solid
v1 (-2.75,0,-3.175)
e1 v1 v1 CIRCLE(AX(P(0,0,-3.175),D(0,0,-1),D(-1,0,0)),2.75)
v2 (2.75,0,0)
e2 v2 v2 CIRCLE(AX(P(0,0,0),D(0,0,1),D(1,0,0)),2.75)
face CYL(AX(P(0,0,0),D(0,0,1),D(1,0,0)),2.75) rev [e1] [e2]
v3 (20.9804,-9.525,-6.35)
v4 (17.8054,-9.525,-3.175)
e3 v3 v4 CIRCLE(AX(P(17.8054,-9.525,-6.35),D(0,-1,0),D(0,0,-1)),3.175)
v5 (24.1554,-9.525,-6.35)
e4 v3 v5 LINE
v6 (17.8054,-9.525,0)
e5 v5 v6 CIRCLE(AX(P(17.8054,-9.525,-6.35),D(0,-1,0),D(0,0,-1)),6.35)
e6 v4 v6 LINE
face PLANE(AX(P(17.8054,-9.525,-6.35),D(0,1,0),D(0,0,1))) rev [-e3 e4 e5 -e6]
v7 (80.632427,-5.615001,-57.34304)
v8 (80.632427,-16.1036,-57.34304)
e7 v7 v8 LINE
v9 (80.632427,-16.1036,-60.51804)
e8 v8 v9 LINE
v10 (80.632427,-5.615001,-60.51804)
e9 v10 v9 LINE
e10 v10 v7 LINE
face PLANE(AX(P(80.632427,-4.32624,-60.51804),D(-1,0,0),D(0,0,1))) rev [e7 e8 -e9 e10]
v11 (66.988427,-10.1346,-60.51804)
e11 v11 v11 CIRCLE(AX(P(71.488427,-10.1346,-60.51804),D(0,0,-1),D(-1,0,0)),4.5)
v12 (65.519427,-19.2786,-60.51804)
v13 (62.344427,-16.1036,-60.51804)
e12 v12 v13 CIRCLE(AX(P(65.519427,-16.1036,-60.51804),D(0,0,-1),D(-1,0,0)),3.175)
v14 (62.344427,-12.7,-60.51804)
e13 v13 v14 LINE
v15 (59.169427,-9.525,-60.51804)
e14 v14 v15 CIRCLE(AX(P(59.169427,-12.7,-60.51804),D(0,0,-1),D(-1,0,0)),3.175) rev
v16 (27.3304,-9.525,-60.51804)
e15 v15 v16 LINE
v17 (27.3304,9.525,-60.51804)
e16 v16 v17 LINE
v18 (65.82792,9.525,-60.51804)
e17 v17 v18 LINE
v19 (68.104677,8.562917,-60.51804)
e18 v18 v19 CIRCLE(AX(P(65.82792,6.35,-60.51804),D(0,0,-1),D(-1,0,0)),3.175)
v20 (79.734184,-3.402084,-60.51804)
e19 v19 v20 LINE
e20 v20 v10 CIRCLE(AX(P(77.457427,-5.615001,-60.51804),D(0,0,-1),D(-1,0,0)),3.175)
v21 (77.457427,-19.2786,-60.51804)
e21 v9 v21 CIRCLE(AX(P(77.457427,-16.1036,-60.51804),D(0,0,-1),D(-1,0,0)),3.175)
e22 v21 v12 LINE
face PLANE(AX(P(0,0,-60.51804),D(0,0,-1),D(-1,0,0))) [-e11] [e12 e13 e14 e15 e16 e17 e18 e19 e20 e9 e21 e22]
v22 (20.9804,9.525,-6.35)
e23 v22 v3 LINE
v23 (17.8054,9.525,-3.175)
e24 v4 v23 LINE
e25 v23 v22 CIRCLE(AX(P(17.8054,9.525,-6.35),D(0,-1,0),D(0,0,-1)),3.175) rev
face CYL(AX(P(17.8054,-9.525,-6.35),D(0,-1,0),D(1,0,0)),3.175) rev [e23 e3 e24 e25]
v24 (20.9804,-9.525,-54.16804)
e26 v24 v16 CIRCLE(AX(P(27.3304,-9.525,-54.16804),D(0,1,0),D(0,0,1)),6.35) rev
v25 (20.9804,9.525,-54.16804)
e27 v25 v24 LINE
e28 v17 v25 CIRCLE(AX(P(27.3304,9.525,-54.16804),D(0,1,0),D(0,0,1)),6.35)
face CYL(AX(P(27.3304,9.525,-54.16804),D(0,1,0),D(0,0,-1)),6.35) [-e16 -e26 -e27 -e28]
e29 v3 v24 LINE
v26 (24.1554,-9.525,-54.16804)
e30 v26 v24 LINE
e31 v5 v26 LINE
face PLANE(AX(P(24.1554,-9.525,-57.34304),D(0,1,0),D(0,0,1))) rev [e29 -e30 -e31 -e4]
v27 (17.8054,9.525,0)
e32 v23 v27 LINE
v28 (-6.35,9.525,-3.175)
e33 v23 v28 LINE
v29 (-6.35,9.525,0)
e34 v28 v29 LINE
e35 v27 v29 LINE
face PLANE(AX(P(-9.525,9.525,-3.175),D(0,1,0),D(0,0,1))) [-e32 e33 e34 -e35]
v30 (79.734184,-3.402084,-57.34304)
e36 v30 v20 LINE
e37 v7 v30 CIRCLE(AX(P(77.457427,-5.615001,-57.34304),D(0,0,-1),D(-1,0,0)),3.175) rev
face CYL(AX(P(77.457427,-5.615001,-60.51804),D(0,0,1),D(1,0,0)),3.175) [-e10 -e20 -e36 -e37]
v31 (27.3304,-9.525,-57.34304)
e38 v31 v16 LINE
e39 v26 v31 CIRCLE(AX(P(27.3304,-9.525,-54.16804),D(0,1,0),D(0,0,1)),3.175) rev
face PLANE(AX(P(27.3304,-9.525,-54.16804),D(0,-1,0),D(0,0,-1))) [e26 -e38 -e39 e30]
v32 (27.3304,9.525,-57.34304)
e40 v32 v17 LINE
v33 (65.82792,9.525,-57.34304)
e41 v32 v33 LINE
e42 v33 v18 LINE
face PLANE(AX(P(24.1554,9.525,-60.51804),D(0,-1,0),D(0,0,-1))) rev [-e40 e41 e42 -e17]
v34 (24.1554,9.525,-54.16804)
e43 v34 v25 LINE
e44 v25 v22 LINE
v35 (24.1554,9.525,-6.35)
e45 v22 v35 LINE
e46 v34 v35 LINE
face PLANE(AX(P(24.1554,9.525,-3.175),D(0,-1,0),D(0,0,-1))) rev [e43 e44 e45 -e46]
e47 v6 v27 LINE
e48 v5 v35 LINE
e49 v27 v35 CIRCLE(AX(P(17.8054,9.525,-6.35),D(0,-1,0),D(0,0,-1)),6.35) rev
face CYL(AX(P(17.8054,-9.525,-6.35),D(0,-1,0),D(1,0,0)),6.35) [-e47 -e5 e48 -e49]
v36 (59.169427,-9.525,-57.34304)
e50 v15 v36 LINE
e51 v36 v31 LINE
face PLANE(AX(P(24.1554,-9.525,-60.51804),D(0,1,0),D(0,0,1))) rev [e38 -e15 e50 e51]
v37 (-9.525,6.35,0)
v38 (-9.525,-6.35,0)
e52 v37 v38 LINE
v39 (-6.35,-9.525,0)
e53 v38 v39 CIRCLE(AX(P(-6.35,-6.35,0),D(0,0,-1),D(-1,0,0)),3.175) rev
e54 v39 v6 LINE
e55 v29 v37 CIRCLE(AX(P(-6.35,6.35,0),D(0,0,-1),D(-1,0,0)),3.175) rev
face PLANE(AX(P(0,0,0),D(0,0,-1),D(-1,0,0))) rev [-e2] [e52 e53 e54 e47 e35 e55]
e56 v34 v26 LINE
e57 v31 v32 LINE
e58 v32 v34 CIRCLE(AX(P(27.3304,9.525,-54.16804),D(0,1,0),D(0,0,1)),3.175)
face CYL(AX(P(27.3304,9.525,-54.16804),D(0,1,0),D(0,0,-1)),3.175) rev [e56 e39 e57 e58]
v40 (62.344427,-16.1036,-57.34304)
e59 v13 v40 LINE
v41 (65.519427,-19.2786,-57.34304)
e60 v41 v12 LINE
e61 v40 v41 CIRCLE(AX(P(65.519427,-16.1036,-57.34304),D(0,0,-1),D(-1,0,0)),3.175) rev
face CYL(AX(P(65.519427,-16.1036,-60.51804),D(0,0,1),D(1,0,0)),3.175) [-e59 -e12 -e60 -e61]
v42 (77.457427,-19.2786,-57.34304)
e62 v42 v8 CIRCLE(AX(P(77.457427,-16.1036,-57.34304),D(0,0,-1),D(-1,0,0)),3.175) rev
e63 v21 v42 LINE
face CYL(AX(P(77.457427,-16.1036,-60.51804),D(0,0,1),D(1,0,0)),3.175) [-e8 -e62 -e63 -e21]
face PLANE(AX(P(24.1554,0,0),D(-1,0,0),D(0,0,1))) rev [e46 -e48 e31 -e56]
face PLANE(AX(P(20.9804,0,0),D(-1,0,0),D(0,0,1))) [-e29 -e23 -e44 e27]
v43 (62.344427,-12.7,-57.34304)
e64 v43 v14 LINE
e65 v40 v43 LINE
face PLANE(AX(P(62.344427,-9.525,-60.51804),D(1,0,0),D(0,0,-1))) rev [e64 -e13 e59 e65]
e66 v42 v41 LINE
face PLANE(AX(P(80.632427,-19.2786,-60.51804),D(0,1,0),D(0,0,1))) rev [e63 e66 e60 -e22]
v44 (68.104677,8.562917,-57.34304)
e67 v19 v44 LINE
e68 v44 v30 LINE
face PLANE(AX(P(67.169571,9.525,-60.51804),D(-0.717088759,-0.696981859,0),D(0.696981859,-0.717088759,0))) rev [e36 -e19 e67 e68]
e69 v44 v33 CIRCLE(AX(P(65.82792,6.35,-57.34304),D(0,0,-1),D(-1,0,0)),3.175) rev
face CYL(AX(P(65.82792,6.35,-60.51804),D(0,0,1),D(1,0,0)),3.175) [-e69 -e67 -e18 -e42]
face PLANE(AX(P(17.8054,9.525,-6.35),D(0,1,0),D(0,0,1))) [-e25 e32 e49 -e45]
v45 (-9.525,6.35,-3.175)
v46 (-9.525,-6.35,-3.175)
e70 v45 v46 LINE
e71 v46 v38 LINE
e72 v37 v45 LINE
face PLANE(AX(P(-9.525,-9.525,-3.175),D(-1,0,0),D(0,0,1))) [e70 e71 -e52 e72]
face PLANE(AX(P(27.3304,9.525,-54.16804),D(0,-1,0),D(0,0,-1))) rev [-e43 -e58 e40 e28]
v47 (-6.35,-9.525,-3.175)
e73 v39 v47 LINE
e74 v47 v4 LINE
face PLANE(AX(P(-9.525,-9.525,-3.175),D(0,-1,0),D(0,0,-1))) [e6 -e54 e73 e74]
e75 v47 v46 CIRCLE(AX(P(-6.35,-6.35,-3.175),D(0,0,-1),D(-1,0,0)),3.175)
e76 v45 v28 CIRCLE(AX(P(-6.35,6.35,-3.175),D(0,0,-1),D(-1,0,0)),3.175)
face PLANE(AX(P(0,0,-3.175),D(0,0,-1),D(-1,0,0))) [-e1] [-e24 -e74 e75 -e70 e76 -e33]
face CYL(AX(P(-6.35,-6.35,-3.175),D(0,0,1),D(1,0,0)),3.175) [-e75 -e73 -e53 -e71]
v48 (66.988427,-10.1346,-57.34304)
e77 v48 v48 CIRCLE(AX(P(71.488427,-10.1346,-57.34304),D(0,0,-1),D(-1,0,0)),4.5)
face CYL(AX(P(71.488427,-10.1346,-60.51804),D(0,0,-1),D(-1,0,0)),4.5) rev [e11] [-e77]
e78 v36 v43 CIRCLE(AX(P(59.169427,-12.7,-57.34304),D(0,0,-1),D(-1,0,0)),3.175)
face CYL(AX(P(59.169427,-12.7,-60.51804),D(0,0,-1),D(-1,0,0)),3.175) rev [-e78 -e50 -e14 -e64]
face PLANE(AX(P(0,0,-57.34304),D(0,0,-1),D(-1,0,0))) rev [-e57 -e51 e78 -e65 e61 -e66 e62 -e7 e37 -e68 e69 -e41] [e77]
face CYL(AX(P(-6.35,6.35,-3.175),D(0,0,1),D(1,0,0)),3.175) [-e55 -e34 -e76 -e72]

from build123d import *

# Parameters (mm, degrees)
SKETCH2_W                    = 33.6804
SKETCH2_H                    = 19.05
SKETCH2_R                    = 1.189975692
BASE_FLANGE1_DEPTH           = 3.175
EDGE_FLANGE3_STRIP_W         = 19.05
EDGE_FLANGE3_STRIP_H         = 3.175
EDGE_FLANGE3_STRIP_CUT_DEPTH = 19.05
EDGE_FLANGE3_DEPTH           = 19.05
M5_CLEARANCE_HOLE1_D         = 5.5
EDGE_FLANGE5_STRIP_W         = 19.05
EDGE_FLANGE5_STRIP_H         = 3.175
EDGE_FLANGE5_STRIP_CUT_DEPTH = 19.05
EDGE_FLANGE5_DEPTH           = 19.05
EDGE_FLANGE5_START           = 3.175
EDGE_FLANGE5_PROFILE_R       = 1.708184841
EDGE_FLANGE5_FLAT_DEPTH      = 3.175
M8_CLEARANCE_HOLE1_D         = 9
FILLET2_R                    = 3.175


# Sheet-metal steps are written as plain solids
with BuildPart() as part:
    # Sketch2 → Base-Flange1 (new body)
    with BuildSketch(Plane.XY):
        with Locations((7.3152, 0)):
            Rectangle(SKETCH2_W, SKETCH2_H)
        Circle(SKETCH2_R, mode=Mode.SUBTRACT)
    extrude(amount=-BASE_FLANGE1_DEPTH)

    # Edge-Flange3 strip (across the edge) → Edge-Flange3 strip cut (cut)
    with BuildSketch(Plane(origin=(24.1554, 9.525, -3.175), x_dir=(-1, 0, 0), z_dir=(0, -1, 0))):
        with Locations((-3.175, -1.5875)):
            Rectangle(EDGE_FLANGE3_STRIP_W, EDGE_FLANGE3_STRIP_H)
    extrude(amount=EDGE_FLANGE3_STRIP_CUT_DEPTH, mode=Mode.SUBTRACT)

    # Edge-Flange3 section (across the edge) → Edge-Flange3 (add)
    with BuildSketch(Plane(origin=(24.1554, 9.525, -3.175), x_dir=(-1, 0, 0), z_dir=(0, -1, 0))):
        with BuildLine():
            Line((0, 3.175), (0, 54.16804))
            Line((0, 54.16804), (3.175, 54.16804))
            Line((3.175, 54.16804), (3.175, 3.175))
            ThreePointArc((3.175, 3.175), (4.10493597, 0.92993597), (6.35, 0))
            Line((6.35, 0), (6.35, -3.175))
            ThreePointArc((6.35, -3.175), (1.859871939, -1.315128061), (0, 3.175))
        make_face()
    extrude(amount=EDGE_FLANGE3_DEPTH)

    # M5 Clearance Hole1 (through all)
    with Locations(Plane.XY):
        with Locations((0, 0)):
            Hole(M5_CLEARANCE_HOLE1_D / 2)

    # Edge-Flange5 strip (across the edge) → Edge-Flange5 strip cut (cut)
    with BuildSketch(Plane(origin=(24.1554, -9.525, -57.34304), x_dir=(0, 0, 1), z_dir=(0, 1, 0))):
        with Locations((-6.35, -1.5875)):
            Rectangle(EDGE_FLANGE5_STRIP_W, EDGE_FLANGE5_STRIP_H)
    extrude(amount=EDGE_FLANGE5_STRIP_CUT_DEPTH, mode=Mode.SUBTRACT)

    # Edge-Flange5 bend section (across the edge) → Edge-Flange5 (add)
    with BuildSketch(Plane(origin=(24.1554, -9.525, -57.34304), x_dir=(0, 0, 1), z_dir=(0, 1, 0))):
        with BuildLine():
            Line((-3.175, 3.175), (0, 3.175))
            ThreePointArc((0, 3.175), (0.92993597, 0.92993597), (3.175, 0))
            Line((3.175, 0), (3.175, -3.175))
            ThreePointArc((3.175, -3.175), (-1.315128061, -1.315128061), (-3.175, 3.175))
        make_face()
    extrude(amount=EDGE_FLANGE5_DEPTH)

    # Edge-Flange5 profile (on flange) → Edge-Flange5 flat (add)
    with BuildSketch(Plane(origin=(24.1554, 0, -57.34304), x_dir=(0, 1, 0), z_dir=(0, 0, -1)).offset(EDGE_FLANGE5_START)):
        Polygon((-9.525, 3.175), (9.525, 3.175), (9.525, 43.014170651), (-4.326239915, 56.477027), (-19.2786, 56.477027), (-19.2786, 38.189027), (-9.525, 38.189027), align=None)
        with Locations((-10.1346, 47.333027)):
            Circle(EDGE_FLANGE5_PROFILE_R, mode=Mode.SUBTRACT)
    extrude(amount=-EDGE_FLANGE5_FLAT_DEPTH)

    # M8 Clearance Hole1 (through all)
    with Locations(Plane(origin=(0, 0, -60.51804), x_dir=(-1, 0, 0), z_dir=(0, 0, -1))):
        with Locations((-71.488427, -10.1346)):
            Hole(M8_CLEARANCE_HOLE1_D / 2)

    # Fillet2
    fillet2_edges = [part.edges().sort_by_distance(p)[0] for p in [
        (-9.525, 9.525, -1.5875),
        (62.344427, -9.525, -58.93054),
        (67.169570651, 9.525, -58.93054),
        (-9.525, -9.525, -1.5875),
        (80.632427, -4.326239915, -58.93054),
        (80.632427, -19.2786, -58.93054),
        (62.344427, -19.2786, -58.93054),
    ]]
    fillet(fillet2_edges, radius=FILLET2_R)


solid = part.part
